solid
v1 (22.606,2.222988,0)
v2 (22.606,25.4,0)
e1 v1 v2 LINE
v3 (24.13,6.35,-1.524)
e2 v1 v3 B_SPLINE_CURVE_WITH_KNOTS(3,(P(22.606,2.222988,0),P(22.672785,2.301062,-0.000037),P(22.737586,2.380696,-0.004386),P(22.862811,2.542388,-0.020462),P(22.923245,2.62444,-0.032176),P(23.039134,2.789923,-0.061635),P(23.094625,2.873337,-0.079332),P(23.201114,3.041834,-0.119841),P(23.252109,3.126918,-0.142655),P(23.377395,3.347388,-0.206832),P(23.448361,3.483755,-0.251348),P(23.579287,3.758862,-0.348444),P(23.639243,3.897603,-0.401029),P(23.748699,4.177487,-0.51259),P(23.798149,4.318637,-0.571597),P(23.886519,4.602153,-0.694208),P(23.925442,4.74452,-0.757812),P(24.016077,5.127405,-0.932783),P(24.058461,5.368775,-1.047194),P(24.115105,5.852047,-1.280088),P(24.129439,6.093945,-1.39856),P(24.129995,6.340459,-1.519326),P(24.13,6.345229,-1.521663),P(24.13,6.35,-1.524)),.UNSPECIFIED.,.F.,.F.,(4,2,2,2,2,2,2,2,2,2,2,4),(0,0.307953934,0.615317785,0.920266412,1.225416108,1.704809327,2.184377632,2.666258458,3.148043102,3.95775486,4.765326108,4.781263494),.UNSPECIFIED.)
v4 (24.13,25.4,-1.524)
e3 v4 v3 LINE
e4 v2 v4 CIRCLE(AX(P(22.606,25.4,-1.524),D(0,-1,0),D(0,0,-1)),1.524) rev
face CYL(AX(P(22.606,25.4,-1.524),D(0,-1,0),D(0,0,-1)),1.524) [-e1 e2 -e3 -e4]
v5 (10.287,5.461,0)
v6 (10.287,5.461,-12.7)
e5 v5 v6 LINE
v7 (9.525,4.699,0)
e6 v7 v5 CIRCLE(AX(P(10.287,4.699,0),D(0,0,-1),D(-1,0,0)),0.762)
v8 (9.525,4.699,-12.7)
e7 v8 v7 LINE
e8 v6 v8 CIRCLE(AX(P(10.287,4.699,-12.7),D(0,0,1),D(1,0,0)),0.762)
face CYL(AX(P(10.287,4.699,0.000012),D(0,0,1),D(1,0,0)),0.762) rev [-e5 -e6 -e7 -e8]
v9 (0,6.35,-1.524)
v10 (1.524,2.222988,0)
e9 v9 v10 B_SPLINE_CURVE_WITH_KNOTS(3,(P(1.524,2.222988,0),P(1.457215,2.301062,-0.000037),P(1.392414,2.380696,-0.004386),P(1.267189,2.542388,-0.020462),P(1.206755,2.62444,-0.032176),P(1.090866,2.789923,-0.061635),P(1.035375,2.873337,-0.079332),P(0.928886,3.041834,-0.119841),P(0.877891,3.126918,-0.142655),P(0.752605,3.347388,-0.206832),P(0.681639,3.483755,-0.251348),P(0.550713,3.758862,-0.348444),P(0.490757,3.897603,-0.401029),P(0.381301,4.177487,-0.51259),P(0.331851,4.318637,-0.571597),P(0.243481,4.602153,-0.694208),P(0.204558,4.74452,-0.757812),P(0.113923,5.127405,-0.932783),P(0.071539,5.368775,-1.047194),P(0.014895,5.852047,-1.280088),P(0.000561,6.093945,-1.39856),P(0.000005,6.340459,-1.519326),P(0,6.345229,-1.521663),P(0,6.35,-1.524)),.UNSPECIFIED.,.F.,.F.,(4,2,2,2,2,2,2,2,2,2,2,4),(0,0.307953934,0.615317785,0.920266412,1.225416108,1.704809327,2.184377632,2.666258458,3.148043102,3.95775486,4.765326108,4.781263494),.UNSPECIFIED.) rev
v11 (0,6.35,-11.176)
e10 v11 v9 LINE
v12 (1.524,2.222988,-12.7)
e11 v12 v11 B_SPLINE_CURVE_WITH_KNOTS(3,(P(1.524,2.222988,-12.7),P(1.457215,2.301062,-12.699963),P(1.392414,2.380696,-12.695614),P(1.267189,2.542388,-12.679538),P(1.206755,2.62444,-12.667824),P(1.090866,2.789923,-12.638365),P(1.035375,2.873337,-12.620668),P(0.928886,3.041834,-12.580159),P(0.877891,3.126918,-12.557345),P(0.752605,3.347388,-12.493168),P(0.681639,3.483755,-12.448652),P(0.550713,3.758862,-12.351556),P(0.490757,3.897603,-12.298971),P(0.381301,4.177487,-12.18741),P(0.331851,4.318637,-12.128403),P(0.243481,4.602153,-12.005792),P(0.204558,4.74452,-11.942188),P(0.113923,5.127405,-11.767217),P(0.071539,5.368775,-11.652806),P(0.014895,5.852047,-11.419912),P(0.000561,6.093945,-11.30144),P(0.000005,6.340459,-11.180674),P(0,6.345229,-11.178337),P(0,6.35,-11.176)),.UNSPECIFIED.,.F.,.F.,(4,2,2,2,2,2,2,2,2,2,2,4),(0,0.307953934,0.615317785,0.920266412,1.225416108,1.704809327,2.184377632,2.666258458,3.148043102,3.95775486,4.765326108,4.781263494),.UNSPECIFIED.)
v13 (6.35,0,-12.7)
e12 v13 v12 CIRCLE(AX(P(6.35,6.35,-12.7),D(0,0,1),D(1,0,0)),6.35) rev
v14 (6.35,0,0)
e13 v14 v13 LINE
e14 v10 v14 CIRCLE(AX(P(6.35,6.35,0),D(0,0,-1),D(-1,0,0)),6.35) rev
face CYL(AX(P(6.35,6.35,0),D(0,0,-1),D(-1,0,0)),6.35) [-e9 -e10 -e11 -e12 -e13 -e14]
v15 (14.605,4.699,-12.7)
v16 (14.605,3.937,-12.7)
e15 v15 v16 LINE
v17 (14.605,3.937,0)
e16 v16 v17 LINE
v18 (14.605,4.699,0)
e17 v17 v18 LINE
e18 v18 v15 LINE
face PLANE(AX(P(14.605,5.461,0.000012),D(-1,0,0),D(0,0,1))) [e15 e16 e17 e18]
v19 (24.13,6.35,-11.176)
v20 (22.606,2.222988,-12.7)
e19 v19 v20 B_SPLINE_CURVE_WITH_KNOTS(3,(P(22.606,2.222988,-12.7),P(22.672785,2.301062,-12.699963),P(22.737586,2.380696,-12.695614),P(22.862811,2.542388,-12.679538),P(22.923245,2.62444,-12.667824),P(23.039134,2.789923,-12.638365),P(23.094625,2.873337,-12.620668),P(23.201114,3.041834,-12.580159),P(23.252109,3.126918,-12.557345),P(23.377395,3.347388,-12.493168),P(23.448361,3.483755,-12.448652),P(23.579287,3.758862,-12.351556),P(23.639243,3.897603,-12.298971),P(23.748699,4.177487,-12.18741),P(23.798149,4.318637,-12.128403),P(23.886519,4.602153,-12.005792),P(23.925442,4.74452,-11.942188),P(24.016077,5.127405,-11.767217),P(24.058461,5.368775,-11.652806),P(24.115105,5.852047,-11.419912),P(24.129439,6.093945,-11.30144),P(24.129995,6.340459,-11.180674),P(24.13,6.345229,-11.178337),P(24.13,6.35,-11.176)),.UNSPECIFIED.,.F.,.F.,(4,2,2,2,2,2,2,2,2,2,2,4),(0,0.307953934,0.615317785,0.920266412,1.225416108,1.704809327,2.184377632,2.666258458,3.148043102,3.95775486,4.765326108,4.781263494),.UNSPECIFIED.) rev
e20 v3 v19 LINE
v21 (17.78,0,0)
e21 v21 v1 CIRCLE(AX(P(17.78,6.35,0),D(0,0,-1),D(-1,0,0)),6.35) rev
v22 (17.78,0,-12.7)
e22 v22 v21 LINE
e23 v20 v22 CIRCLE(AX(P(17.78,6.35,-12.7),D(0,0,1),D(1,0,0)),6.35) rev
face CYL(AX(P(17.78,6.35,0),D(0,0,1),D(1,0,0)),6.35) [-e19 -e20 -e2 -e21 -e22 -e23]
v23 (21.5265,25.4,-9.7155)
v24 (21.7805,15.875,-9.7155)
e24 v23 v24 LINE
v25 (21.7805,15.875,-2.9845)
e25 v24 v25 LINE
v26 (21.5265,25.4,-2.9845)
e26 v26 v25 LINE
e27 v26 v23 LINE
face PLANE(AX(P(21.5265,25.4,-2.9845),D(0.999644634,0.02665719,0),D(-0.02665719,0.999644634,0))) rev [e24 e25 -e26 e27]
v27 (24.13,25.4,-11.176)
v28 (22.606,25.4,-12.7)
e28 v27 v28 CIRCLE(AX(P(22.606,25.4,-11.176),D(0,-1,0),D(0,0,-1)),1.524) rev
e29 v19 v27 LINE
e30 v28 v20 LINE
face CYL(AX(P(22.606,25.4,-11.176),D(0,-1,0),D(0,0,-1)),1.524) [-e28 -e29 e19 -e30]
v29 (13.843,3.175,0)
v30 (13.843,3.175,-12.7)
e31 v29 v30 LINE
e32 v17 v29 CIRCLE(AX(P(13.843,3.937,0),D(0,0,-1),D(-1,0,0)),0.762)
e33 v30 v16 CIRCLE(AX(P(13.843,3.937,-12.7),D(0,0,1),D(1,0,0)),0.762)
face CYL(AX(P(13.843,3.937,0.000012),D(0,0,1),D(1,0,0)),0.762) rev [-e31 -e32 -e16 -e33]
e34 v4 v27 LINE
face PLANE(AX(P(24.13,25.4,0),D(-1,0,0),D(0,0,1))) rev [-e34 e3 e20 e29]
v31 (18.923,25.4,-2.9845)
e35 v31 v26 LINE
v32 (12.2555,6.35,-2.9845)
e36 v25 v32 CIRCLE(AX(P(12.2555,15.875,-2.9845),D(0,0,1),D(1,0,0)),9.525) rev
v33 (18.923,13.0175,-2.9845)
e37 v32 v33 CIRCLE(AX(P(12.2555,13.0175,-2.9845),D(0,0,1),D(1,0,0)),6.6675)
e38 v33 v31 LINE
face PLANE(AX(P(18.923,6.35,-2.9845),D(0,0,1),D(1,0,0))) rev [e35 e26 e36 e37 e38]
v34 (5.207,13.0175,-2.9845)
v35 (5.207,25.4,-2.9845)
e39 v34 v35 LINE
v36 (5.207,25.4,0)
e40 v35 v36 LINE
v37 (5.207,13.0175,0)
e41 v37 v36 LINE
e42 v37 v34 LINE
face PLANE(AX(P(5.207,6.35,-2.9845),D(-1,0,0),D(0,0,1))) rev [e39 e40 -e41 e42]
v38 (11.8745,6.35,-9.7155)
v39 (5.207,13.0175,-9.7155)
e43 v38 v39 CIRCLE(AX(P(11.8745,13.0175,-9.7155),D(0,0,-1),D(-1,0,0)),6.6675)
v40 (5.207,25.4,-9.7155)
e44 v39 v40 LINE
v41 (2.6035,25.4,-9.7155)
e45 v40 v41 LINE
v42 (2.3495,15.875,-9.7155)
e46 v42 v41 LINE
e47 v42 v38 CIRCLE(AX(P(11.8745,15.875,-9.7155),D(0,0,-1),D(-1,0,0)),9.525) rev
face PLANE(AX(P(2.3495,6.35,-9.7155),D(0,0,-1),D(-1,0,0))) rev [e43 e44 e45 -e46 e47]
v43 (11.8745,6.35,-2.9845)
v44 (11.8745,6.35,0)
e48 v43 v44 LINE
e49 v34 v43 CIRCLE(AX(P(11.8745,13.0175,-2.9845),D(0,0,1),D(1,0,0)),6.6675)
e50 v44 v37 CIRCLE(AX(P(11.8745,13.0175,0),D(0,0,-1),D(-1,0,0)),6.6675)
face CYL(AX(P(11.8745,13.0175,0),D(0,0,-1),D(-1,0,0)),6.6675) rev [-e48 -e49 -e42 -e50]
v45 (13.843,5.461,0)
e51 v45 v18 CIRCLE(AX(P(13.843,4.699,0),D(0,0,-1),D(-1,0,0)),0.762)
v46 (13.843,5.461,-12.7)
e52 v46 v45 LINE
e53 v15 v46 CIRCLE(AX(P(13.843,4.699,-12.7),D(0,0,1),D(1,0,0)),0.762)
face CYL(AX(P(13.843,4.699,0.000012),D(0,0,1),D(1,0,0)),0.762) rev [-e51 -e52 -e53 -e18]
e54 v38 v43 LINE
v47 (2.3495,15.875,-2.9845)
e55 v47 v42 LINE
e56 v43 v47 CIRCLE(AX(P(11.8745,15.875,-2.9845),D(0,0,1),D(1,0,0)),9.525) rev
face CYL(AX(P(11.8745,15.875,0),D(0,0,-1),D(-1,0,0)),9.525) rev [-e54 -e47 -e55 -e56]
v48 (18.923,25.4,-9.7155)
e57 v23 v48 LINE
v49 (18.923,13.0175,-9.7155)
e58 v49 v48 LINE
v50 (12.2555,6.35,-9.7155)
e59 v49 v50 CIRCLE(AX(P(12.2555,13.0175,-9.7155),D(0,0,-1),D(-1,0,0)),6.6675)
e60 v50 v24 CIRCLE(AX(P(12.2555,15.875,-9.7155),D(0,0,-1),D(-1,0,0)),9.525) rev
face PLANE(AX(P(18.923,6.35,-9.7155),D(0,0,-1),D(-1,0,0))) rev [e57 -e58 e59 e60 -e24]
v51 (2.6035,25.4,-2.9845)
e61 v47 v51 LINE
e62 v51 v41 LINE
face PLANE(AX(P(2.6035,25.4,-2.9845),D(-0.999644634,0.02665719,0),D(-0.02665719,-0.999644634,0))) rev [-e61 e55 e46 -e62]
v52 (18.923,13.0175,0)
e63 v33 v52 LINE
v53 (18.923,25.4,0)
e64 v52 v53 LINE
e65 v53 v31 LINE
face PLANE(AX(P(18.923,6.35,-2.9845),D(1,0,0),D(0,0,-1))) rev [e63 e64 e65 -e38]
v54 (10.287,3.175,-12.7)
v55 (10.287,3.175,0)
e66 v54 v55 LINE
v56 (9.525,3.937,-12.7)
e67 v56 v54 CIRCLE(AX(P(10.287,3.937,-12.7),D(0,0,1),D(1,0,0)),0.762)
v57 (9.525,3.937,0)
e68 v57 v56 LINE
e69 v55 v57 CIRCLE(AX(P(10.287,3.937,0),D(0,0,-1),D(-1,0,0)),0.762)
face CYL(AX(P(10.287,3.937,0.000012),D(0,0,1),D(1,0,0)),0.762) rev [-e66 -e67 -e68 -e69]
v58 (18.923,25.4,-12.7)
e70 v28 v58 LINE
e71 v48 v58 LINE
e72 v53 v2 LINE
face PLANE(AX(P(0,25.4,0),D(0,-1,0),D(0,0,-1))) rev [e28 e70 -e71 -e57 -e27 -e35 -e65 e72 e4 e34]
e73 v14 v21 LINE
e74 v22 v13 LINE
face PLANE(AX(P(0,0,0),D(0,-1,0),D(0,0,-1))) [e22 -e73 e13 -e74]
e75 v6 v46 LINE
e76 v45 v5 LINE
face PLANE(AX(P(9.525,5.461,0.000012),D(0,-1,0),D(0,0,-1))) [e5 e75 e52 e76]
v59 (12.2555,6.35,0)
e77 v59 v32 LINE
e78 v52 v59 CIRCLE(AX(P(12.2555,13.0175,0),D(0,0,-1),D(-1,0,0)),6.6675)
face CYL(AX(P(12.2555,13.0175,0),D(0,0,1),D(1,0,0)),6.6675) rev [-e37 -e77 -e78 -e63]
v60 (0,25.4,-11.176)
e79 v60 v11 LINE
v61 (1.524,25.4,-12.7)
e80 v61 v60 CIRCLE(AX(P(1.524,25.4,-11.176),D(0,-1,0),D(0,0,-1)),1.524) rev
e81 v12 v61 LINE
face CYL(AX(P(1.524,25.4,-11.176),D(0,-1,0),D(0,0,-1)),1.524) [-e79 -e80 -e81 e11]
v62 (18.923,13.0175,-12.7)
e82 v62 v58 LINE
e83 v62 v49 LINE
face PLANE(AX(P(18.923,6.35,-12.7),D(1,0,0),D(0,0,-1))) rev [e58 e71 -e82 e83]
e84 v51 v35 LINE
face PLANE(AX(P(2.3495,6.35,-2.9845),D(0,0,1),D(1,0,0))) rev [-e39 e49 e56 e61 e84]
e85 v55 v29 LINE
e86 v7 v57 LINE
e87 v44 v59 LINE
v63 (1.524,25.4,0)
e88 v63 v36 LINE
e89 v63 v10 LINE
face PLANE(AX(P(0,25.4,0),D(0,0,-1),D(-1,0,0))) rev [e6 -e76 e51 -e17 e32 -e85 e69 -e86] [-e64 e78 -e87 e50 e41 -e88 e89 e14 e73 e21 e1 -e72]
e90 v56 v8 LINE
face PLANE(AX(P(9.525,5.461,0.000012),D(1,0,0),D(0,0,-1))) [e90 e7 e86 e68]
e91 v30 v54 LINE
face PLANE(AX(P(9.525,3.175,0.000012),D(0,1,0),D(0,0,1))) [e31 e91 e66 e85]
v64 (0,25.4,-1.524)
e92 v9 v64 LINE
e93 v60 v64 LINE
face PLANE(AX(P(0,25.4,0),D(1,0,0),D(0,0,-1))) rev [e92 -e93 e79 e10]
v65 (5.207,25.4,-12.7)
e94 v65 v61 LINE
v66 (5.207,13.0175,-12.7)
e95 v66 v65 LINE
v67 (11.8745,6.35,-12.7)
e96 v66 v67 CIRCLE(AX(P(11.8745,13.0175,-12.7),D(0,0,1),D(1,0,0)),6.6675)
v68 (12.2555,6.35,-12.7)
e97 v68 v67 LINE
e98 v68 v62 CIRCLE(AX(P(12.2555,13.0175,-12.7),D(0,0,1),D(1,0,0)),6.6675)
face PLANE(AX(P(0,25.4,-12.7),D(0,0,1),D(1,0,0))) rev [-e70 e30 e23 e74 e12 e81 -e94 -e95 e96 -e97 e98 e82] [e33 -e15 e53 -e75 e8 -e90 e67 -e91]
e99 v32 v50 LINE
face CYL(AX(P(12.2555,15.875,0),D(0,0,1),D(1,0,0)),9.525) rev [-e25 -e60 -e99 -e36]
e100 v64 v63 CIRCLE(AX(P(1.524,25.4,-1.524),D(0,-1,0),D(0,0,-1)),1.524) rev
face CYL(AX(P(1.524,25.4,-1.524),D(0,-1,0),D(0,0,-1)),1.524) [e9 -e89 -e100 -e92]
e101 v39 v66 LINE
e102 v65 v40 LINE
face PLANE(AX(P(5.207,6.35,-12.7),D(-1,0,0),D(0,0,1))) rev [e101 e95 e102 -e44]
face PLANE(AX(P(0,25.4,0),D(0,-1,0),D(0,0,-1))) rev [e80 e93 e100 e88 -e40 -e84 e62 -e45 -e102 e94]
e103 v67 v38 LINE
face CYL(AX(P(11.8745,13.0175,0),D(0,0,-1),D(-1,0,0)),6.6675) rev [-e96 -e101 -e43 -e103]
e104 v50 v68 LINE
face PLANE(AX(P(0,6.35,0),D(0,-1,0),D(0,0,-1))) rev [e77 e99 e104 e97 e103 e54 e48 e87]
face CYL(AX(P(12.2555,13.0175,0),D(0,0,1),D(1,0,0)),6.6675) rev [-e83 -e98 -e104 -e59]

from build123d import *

# Parameters (mm, degrees)
SKETCH1_W                      = 24.13
SKETCH1_H                      = 12.7
BOSS_EXTRUDE1_DEPTH            = 25.4
CUT_EXTRUDE2_DEPTH             = 19.05
FILLET1_R                      = 9.525
FILLET2_R                      = 6.6675
BOSS_EXTRUDE2_DEPTH            = 3.3655
CUT_EXTRUDE3_REACH             = 39.265
SKETCH4_W                      = 5.08
SKETCH4_H                      = 2.286
CUT_EXTRUDE3_DIRECTION_2_DEPTH = 38.265357908
FILLET3_R                      = 0.762
FILLET4_R                      = 1.524
FILLET5_R                      = 6.35


# Some blends are built 0.0001 mm under size
with BuildPart() as part:
    # Sketch1 → Boss-Extrude1 (new body)
    with BuildSketch(Plane(origin=(0, 0, 0), x_dir=(1, 0, 0), z_dir=(0, 1, 0))):
        with Locations((12.065, 6.35)):
            Rectangle(SKETCH1_W, SKETCH1_H)
    extrude(amount=BOSS_EXTRUDE1_DEPTH)

    # Sketch2 → Cut-Extrude2 (cut)
    with BuildSketch(Plane(origin=(0, 25.4, 0), x_dir=(1, 0, 0), z_dir=(0, 1, 0))):
        Polygon((2.3495, 2.9845), (5.207, 2.9845), (5.207, 0), (18.923, 0), (18.923, 2.9845), (21.7805, 2.9845), (21.7805, 9.7155), (18.923, 9.7155), (18.923, 12.7), (5.207, 12.7), (5.207, 9.7155), (2.3495, 9.7155), align=None)
    extrude(amount=-CUT_EXTRUDE2_DEPTH, mode=Mode.SUBTRACT)

    # Fillet1
    fillet1_edges = [part.edges().sort_by_distance(p)[0] for p in [
        (21.7805, 6.35, -6.35),
        (2.3495, 6.35, -6.35),
    ]]
    fillet(fillet1_edges, radius=FILLET1_R)

    # Fillet2
    fillet2_edges = [part.edges().sort_by_distance(p)[0] for p in [
        (5.207, 9.072789422, -11.20775),
        (18.923, 9.072789422, -11.20775),
        (18.923, 9.072789422, -1.49225),
        (5.207, 9.072789422, -1.49225),
    ]]
    fillet(fillet2_edges, radius=FILLET2_R - 0.0001)  # a hair under: the kernel refuses the full size

    # Sketch3 → Boss-Extrude2 (add, symmetric)
    with BuildSketch(Plane.XY.offset(-6.35)):
        Polygon((21.7805, 25.4), (21.5265, 25.4), (21.7805, 15.875), align=None)
        Polygon((2.3495, 25.4), (2.6035, 25.4), (2.3495, 15.875), align=None)
    extrude(amount=BOSS_EXTRUDE2_DEPTH, both=True)

    # Sketch4 → Cut-Extrude3 (cut, up to next)
    with BuildSketch(Plane.XY, mode=Mode.PRIVATE) as cut_extrude3_sk1:
        with Locations((12.065, 4.318)):
            Rectangle(SKETCH4_W, SKETCH4_H)
    cut_extrude3_tool1 = extrude(cut_extrude3_sk1.sketch, amount=-CUT_EXTRUDE3_REACH, mode=Mode.PRIVATE) & part.part
    add(cut_extrude3_tool1.solids().sort_by_distance((12.065, 4.318, 0))[0], mode=Mode.SUBTRACT)

    # Sketch4 → Cut-Extrude3 direction 2 (cut)
    with BuildSketch(Plane.XY):
        with Locations((12.065, 4.318)):
            Rectangle(SKETCH4_W, SKETCH4_H)
    extrude(amount=CUT_EXTRUDE3_DIRECTION_2_DEPTH, mode=Mode.SUBTRACT)

    # Fillet3
    fillet3_edges = [part.edges().sort_by_distance(p)[0] for p in [
        (9.525, 5.461, -6.35),
        (9.525, 3.175, -6.35),
        (14.605, 3.175, -6.35),
        (14.605, 5.461, -6.35),
    ]]
    fillet(fillet3_edges, radius=FILLET3_R)

    # Fillet4
    fillet4_edges = [part.edges().sort_by_distance(p)[0] for p in [
        (0, 12.7, -12.7),
        (24.13, 12.7, -12.7),
        (24.13, 12.7, 0),
        (0, 12.7, 0),
    ]]
    fillet(fillet4_edges, radius=FILLET4_R)

    # Fillet5
    # the kernel refuses this fillet: 6.35 mm, written as the material it takes off along each edge
    with BuildSketch(Plane(origin=(24.13, 0, 14.351), x_dir=(-1, 0, 0), z_dir=(0, 0, -1)), Plane(origin=(0, 0, -27.051), x_dir=(1, 0, 0), z_dir=(0, 0, 1))) as fillet5_piece_1:
        with BuildLine():
            CenterArc((FILLET5_R, FILLET5_R), FILLET5_R, 180, 90)
            Line((0, FILLET5_R), (0, 0))
            Line((0, 0), (FILLET5_R, 0))
        make_face()
    extrude(amount=41.402, mode=Mode.SUBTRACT)


solid = part.part
